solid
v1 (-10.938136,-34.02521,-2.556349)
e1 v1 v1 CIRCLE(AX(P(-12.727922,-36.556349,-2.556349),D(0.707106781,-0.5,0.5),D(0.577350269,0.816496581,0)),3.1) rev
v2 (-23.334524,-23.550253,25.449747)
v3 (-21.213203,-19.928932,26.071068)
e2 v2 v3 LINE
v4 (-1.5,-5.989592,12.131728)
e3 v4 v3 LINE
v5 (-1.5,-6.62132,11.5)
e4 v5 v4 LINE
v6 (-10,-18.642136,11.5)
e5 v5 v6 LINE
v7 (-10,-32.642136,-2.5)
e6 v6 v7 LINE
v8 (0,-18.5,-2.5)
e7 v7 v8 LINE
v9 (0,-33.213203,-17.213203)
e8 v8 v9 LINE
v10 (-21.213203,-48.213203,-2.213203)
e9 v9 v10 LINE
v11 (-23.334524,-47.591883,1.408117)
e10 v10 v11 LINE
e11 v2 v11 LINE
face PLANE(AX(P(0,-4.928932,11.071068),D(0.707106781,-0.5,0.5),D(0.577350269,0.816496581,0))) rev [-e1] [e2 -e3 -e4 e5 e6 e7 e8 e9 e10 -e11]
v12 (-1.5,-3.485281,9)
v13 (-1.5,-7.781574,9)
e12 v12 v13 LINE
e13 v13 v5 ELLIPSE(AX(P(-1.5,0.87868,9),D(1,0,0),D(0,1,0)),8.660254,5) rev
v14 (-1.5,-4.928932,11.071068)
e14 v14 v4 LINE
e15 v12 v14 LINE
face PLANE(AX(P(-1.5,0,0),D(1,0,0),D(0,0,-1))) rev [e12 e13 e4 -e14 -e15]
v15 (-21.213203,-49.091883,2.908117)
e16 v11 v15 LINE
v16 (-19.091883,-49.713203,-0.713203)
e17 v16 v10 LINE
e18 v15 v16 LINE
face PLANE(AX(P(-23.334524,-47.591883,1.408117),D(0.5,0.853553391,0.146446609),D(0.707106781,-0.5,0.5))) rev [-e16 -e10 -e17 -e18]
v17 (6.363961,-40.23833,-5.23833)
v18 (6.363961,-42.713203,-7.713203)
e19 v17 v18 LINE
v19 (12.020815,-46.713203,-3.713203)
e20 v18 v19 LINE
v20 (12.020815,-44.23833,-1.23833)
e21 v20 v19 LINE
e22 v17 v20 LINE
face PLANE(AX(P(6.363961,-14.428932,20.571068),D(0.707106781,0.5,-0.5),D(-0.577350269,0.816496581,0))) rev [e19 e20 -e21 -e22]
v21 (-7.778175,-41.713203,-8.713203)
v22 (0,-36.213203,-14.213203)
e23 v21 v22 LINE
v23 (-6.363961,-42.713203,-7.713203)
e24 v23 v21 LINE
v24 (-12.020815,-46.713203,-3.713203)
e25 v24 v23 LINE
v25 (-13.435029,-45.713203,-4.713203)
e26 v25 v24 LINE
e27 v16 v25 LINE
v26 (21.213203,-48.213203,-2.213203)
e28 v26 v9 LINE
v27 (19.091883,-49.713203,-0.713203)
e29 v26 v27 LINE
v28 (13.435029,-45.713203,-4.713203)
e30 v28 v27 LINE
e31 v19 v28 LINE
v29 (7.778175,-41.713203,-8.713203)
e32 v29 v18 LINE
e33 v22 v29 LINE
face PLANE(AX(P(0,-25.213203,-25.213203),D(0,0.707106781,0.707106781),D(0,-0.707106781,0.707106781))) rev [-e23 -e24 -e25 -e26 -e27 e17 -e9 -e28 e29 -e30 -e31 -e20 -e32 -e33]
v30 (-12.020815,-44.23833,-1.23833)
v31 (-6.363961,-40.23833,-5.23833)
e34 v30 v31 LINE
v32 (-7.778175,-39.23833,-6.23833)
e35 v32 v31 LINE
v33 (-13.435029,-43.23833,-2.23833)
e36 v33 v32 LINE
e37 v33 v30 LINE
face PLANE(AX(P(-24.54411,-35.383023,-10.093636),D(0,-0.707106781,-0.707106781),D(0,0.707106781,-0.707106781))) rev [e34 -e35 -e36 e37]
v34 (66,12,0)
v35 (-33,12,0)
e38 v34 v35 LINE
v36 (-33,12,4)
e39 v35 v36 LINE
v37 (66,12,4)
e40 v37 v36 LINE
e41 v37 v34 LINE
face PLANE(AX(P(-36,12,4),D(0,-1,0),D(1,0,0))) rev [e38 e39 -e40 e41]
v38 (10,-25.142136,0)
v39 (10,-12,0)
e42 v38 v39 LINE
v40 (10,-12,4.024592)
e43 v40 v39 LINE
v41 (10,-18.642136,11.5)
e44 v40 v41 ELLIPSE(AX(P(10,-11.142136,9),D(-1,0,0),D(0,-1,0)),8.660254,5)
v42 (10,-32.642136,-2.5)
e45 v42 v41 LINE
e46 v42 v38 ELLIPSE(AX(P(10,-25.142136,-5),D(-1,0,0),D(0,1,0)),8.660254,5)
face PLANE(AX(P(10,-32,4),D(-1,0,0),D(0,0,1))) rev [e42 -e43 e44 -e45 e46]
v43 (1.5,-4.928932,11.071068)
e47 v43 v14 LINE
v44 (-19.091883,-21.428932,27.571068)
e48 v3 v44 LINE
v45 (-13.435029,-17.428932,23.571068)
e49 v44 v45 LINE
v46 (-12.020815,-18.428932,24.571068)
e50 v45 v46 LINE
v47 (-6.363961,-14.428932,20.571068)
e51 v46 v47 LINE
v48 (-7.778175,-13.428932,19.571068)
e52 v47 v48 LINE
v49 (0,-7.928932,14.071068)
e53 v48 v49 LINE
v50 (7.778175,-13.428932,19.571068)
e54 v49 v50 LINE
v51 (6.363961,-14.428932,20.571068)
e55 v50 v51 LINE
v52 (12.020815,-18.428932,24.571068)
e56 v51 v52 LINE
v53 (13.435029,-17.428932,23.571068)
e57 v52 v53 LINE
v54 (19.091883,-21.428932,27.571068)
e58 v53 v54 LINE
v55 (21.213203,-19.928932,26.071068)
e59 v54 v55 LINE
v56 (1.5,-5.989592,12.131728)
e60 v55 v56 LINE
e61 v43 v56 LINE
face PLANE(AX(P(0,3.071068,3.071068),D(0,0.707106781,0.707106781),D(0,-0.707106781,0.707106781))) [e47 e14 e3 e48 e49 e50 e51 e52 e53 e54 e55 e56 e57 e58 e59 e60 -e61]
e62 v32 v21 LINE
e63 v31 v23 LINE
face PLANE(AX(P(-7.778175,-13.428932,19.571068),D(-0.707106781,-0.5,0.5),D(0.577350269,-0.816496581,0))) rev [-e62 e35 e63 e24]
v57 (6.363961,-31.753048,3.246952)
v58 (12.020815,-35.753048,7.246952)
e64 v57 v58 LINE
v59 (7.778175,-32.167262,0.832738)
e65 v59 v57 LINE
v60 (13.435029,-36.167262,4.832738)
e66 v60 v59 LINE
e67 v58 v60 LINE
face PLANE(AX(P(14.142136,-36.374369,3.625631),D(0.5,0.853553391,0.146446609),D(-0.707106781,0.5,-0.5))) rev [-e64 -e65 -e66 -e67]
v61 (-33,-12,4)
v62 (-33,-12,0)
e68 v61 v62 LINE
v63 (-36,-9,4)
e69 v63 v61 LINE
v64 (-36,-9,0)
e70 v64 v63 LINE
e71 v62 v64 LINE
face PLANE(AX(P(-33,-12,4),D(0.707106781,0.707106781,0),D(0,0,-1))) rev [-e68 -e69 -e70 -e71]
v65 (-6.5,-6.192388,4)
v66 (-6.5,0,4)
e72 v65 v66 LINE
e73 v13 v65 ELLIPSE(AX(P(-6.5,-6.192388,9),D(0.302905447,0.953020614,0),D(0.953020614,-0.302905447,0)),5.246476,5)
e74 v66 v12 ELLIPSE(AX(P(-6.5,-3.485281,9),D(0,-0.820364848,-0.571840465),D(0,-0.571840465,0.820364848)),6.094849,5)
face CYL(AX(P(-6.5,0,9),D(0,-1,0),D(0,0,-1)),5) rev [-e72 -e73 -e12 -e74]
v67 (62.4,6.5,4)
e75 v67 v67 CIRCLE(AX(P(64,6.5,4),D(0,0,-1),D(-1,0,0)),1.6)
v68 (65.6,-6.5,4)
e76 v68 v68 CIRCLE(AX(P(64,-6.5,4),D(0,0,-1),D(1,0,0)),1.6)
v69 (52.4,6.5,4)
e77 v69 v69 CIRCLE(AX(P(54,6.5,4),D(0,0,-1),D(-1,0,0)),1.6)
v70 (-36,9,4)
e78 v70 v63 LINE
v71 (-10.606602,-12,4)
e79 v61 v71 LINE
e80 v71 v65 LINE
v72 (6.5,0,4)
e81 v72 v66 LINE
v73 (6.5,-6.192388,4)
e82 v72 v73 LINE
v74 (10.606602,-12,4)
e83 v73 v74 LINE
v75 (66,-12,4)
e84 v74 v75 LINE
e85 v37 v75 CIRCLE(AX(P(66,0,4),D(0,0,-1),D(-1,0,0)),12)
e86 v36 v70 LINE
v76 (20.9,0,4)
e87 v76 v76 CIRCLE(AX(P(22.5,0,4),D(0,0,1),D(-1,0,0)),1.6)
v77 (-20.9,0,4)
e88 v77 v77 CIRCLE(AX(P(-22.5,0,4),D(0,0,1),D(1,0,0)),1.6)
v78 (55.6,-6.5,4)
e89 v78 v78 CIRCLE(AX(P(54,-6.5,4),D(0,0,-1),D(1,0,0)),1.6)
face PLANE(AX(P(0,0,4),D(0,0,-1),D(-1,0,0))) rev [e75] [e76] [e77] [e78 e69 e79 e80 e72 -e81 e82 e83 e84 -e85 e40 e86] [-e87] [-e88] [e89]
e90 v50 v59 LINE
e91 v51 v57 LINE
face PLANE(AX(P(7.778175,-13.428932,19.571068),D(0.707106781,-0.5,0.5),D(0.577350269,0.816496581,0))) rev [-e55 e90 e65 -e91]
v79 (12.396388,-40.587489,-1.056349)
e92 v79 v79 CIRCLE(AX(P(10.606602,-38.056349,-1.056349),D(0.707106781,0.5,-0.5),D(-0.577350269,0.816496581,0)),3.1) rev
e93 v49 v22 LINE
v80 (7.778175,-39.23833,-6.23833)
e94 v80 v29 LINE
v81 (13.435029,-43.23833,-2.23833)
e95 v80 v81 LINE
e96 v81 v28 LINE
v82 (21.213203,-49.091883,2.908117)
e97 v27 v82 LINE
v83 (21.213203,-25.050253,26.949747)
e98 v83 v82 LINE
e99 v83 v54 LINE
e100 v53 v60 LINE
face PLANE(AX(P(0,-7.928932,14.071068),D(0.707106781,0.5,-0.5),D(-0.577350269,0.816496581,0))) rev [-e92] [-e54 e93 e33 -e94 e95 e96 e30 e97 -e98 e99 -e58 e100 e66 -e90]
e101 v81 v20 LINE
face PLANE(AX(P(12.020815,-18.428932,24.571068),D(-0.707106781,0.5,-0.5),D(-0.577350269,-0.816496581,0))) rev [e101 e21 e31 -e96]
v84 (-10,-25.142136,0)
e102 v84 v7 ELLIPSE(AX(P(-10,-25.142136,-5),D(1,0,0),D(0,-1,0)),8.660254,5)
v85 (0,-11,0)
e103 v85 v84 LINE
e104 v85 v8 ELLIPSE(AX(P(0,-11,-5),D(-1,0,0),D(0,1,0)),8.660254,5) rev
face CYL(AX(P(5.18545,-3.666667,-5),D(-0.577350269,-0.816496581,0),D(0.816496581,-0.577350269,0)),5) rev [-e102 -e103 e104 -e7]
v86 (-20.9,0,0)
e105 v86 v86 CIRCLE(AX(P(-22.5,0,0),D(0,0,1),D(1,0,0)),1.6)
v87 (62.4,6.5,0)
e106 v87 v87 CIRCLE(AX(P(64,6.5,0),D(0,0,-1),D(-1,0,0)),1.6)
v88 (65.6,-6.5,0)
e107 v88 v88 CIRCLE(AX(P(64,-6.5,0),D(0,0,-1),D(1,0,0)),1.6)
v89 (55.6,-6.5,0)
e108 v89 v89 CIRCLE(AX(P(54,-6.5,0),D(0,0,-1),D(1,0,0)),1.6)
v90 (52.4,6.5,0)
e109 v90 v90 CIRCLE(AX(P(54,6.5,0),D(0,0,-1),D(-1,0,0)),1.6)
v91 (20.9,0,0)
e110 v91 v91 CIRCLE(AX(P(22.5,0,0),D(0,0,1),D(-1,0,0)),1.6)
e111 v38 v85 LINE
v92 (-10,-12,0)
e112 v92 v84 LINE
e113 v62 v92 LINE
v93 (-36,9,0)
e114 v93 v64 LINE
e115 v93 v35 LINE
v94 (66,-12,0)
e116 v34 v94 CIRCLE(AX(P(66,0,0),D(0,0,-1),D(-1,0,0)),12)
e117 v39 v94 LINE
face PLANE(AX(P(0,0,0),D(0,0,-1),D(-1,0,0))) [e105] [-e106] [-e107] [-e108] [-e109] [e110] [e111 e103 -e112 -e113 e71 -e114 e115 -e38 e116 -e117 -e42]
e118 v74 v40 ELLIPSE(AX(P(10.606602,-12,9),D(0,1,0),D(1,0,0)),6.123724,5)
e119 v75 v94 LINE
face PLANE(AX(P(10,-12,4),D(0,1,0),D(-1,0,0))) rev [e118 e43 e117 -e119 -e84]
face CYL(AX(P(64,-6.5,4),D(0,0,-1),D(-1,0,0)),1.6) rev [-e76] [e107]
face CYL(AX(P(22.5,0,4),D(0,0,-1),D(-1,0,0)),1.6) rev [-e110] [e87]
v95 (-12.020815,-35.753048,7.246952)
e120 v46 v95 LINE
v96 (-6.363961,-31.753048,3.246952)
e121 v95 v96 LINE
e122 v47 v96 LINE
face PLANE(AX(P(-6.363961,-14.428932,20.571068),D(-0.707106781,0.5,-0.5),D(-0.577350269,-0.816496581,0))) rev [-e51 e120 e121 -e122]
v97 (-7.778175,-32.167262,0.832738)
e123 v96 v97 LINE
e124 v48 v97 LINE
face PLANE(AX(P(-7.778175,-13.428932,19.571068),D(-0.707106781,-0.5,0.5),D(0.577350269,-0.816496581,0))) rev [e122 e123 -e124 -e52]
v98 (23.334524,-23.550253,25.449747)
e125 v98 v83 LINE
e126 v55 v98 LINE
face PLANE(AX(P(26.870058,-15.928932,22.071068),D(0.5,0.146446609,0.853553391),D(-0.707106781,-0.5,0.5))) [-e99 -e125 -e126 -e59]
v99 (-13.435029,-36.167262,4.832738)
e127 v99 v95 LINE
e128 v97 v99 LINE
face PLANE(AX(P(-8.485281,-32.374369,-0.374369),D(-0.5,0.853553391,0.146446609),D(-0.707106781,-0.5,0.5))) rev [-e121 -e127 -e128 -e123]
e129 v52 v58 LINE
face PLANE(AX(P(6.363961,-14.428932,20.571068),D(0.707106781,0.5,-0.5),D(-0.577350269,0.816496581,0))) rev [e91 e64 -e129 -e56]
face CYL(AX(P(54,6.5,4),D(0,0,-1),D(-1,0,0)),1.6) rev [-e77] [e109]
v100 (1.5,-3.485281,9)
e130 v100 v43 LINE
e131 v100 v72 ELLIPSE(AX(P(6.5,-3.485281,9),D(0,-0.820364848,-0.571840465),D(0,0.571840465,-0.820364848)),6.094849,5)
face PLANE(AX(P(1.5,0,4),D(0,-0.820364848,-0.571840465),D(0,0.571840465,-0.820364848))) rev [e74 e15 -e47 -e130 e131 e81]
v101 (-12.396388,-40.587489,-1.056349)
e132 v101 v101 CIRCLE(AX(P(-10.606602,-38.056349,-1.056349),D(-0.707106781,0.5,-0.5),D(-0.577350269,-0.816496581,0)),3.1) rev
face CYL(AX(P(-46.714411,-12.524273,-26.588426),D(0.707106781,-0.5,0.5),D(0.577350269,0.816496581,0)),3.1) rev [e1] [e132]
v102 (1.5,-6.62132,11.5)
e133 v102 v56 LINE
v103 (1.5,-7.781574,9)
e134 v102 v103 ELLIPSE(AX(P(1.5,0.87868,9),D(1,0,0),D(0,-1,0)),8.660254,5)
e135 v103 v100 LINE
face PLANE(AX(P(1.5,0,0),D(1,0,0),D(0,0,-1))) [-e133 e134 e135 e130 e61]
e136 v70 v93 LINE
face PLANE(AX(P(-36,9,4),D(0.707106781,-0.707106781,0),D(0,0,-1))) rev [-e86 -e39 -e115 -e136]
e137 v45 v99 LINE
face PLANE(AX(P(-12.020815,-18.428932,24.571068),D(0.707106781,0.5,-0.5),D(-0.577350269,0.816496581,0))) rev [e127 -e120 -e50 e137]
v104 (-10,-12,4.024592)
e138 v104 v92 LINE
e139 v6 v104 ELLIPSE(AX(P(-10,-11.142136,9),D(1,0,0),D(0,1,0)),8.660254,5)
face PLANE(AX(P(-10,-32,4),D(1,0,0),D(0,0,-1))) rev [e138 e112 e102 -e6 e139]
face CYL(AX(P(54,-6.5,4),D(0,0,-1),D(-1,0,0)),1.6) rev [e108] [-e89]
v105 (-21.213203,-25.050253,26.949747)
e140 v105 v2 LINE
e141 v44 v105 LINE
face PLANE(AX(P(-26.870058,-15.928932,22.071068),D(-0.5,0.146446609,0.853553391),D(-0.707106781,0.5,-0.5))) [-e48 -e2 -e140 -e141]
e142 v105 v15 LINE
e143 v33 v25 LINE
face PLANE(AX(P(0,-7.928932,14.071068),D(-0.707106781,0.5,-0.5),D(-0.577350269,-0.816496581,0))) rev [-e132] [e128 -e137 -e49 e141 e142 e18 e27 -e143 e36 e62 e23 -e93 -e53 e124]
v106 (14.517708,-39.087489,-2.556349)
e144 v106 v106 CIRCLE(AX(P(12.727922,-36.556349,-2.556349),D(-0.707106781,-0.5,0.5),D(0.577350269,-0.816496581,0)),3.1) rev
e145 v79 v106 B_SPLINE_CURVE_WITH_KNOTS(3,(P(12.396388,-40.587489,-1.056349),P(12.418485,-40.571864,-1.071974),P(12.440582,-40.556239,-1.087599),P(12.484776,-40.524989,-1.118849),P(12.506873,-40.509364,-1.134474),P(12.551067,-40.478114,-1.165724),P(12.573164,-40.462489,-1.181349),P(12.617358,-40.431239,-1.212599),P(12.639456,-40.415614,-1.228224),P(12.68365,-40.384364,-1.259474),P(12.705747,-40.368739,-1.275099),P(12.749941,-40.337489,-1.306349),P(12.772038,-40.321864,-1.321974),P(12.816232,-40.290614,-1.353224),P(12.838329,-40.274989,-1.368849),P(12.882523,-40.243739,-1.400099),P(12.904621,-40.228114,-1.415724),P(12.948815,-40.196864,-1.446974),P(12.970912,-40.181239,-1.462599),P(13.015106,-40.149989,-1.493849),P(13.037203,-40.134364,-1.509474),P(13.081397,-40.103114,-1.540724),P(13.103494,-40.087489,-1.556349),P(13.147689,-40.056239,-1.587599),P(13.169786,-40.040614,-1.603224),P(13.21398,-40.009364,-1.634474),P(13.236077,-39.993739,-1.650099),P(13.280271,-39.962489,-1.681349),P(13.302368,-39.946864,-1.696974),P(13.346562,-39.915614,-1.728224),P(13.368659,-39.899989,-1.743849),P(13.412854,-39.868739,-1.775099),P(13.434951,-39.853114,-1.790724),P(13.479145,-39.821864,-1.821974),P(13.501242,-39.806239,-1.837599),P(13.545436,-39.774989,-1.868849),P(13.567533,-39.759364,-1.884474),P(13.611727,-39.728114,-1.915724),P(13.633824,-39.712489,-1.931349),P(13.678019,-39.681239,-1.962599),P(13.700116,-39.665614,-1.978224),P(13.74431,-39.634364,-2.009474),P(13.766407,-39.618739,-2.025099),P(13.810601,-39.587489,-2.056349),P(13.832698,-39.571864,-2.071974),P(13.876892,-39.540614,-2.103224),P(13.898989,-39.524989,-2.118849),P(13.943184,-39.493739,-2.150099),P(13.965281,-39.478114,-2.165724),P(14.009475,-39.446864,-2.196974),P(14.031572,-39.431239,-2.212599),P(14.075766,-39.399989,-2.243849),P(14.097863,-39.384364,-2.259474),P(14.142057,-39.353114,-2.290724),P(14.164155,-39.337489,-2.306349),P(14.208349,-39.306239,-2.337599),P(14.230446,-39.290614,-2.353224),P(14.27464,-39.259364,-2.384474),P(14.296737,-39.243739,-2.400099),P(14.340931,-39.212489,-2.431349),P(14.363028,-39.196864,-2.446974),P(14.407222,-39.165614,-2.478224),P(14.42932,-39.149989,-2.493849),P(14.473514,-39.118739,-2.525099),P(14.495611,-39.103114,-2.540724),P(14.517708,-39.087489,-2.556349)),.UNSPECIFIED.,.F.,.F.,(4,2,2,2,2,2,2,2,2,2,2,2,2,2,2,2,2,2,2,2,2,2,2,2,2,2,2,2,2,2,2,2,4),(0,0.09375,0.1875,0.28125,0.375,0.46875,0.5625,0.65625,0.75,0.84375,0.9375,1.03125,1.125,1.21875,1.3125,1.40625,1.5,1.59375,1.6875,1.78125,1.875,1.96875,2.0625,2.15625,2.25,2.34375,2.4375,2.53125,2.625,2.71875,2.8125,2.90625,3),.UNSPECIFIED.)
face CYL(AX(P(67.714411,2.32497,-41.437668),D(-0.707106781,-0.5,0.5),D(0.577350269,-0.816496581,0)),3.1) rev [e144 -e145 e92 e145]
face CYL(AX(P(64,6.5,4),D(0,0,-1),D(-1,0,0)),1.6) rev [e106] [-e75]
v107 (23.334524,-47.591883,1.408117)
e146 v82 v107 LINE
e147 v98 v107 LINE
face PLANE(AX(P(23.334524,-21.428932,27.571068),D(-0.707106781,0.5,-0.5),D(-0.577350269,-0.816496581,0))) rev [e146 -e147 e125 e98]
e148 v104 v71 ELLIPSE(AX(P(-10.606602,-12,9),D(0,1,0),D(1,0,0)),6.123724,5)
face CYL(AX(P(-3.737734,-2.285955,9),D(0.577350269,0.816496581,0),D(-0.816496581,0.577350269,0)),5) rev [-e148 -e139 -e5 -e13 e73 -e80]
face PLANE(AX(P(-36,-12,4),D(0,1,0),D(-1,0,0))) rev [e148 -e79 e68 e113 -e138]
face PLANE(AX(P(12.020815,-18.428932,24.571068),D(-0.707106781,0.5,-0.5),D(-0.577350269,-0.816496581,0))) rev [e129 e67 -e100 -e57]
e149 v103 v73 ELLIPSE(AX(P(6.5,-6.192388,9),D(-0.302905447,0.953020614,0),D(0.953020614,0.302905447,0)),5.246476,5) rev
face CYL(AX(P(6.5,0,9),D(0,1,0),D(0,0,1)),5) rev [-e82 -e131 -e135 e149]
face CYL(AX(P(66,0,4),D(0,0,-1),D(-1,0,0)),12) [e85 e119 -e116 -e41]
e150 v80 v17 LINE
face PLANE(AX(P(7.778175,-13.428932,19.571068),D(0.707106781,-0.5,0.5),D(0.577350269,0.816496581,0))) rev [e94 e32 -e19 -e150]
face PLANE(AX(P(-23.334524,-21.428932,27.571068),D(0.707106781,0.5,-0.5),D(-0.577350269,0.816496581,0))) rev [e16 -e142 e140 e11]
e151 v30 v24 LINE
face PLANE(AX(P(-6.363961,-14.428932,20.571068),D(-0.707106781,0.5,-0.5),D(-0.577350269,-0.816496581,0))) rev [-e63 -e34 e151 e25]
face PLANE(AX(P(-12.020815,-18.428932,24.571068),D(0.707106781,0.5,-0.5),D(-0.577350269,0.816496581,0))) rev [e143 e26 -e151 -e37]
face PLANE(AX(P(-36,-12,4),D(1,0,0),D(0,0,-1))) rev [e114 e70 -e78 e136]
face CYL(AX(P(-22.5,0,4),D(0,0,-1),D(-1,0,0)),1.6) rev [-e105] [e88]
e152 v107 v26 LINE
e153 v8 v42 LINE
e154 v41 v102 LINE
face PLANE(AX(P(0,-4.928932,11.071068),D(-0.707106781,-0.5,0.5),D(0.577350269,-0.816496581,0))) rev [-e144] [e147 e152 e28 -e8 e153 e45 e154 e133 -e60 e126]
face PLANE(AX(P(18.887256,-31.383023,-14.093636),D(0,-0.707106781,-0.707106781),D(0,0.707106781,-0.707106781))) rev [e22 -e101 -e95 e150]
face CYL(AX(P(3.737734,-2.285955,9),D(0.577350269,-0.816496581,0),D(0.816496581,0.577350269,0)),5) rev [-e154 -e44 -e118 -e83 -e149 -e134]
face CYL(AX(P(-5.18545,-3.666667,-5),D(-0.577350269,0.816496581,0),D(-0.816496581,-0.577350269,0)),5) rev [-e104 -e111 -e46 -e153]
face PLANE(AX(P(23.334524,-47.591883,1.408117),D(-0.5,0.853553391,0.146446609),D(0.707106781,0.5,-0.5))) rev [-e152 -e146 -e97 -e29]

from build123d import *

# Parameters (mm, degrees)
CROQUIS1_R                   = 1.6
SALIENTE_EXTRUIR1_DEPTH      = 4
CROQUIS3_R                   = 1.6
SALIENTE_EXTRUIR3_DEPTH      = 4
SALIENTE_EXTRUIR4_DEPTH      = 10
SALIENTE_EXTRUIR4_DEPTH_BACK = 30
CORTAR_EXTRUIR8_REACH        = 102.817
CROQUIS13_R                  = 3.1
CORTAR_EXTRUIR9_DEPTH        = 2
CORTAR_EXTRUIR10_REACH       = 92.973
CROQUIS15_R                  = 3.1
CORTAR_EXTRUIR11_DEPTH       = 2
CORTAR_EXTRUIR12_DEPTH       = 99.523002923
SALIENTE_EXTRUIR5_DEPTH      = 1.5
REDONDEO1_R                  = 5
CHAFL_N1_SIZE                = 3
REDONDEO2_R                  = 5


with BuildPart() as part:
    # Croquis1 → Saliente-Extruir1 (new body)
    with BuildSketch(Plane.XY):
        Polygon((10, -12), (36, -12), (36, 12), (-36, 12), (-36, -12), (-10, -12), (-10, -32), (10, -32), align=None)
        with Locations((-22.5, 0)):
            Circle(CROQUIS1_R, mode=Mode.SUBTRACT)
        with Locations(Location((22.5, 0, 0), (0, 0, 180))):
            Circle(CROQUIS1_R, mode=Mode.SUBTRACT)
    extrude(amount=SALIENTE_EXTRUIR1_DEPTH)

    # Croquis3 → Saliente-Extruir3 (add)
    with BuildSketch(Plane(origin=(0, 0, 0), x_dir=(-1, 0, 0), z_dir=(0, 0, -1))):
        with BuildLine():
            Line((-66, 12), (-36, 12))
            Line((-36, 12), (-36, -12))
            Line((-36, -12), (-66, -12))
            ThreePointArc((-66, -12), (-78, 0), (-66, 12))
        make_face()
        with Locations((-54, 6.5)):
            Circle(CROQUIS3_R, mode=Mode.SUBTRACT)
        with Locations((-64, 6.5)):
            Circle(CROQUIS3_R, mode=Mode.SUBTRACT)
        with Locations(Location((-54, -6.5, 0), (0, 0, 180))):
            Circle(CROQUIS3_R, mode=Mode.SUBTRACT)
        with Locations(Location((-64, -6.5, 0), (0, 0, 180))):
            Circle(CROQUIS3_R, mode=Mode.SUBTRACT)
    extrude(amount=-SALIENTE_EXTRUIR3_DEPTH)

    # Croquis5 → Saliente-Extruir4 (add, two sides: drawn at the far end of the back side and taken through both)
    with BuildSketch(Plane(origin=(0, -4.201010127, -3.798989873), x_dir=(1, 0, 0), z_dir=(0, 0.7071067811865438, 0.7071067811865512)).offset(-SALIENTE_EXTRUIR4_DEPTH_BACK)):
        Polygon((-13.435028843, -28.707106781), (-21.213203436, -36.485281374), (-23.334523779, -34.363961031), (0, -11.029437252), (23.334523779, -34.363961031), (21.213203436, -36.485281374), (13.435028843, -28.707106781), (12.02081528, -30.121320344), (6.363961031, -24.464466094), (7.778174593, -23.050252532), (0, -15.272077939), (-7.778174593, -23.050252532), (-6.363961031, -24.464466094), (-12.02081528, -30.121320344), align=None)
    extrude(amount=SALIENTE_EXTRUIR4_DEPTH + SALIENTE_EXTRUIR4_DEPTH_BACK)

    # Croquis13 → Cortar-Extruir8 (cut, up to next)
    with BuildSketch(Plane(origin=(-9.192388155, -6.5, 6.5), x_dir=(0.40824829046385985, 0.2886751345948103, 0.866025403784441), z_dir=(-0.7071067811865496, -0.5000000000000013, 0.4999999999999959)), mode=Mode.PRIVATE) as cortar_extruir8_sk1:
        with Locations(Location((-7.570619935, -37.19660335, 0), (0, 0, 270))):
            Circle(CROQUIS13_R)
    cortar_extruir8_tool1 = extrude(cortar_extruir8_sk1.sketch, amount=-CORTAR_EXTRUIR8_REACH, mode=Mode.PRIVATE) & part.part
    add(cortar_extruir8_tool1.solids().sort_by_distance((9.192388, -39.056349, -0.056349))[0], mode=Mode.SUBTRACT)

    # Croquis14 → Cortar-Extruir9 (cut)
    with BuildSketch(Plane(origin=(-9.192388155, -6.5, 6.5), x_dir=(0.40824829046385985, 0.2886751345948103, 0.866025403784441), z_dir=(-0.7071067811865496, -0.5000000000000013, 0.4999999999999959))):
        Polygon((-13.554255626, -36.528693238), (-8.935453472, -43.060665885), (-1.586984244, -37.864513462), (-6.205786398, -31.332540815), align=None)
    extrude(amount=-CORTAR_EXTRUIR9_DEPTH, mode=Mode.SUBTRACT)

    # Croquis15 → Cortar-Extruir10 (cut, up to next)
    with BuildSketch(Plane(origin=(6.12825877, -4.333333333, 13), x_dir=(0.6666666666666553, 0.23570226039552375, -0.7071067811865557), z_dir=(0.7071067811865587, -0.49999999999999484, 0.4999999999999895)), mode=Mode.PRIVATE) as cortar_extruir10_sk1:
        with Locations(Location((-9.165824894, -39.075132248, 0), (0, 0, 54.735610317))):
            Circle(CROQUIS15_R)
    cortar_extruir10_tool1 = extrude(cortar_extruir10_sk1.sketch, amount=-CORTAR_EXTRUIR10_REACH, mode=Mode.PRIVATE) & part.part
    add(cortar_extruir10_tool1.solids().sort_by_distance((-9.192388, -39.056349, -0.056349))[0], mode=Mode.SUBTRACT)

    # Croquis17 → Cortar-Extruir11 (cut)
    with BuildSketch(Plane(origin=(6.12825877, -4.333333333, 13), x_dir=(0.6666666666666595, 0.2357022603955385, -0.7071067811865467), z_dir=(0.7071067811865586, -0.4999999999999948, 0.49999999999998956))):
        Polygon((-11.437061061, -44.651106269), (-3.894588728, -41.984439602), (-6.894588728, -33.499158228), (-14.437061061, -36.165824894), align=None)
    extrude(amount=-CORTAR_EXTRUIR11_DEPTH, mode=Mode.SUBTRACT)

    # Croquis18 → Cortar-Extruir12 (cut, through all)
    with BuildSketch(Plane(origin=(0, 3.071067812, 3.071067812), x_dir=(1, 0, 0), z_dir=(0, 0.7071067811865438, 0.7071067811865513))):
        Polygon((-7.071067812, -25.455844123), (-6.363961031, -24.748737342), (-7.778174593, -23.334523779), (0, -15.556349186), (7.778174593, -23.334523779), (6.363961031, -24.748737342), (7.071067812, -25.455844123), align=None)
    extrude(amount=-CORTAR_EXTRUIR12_DEPTH, mode=Mode.SUBTRACT)

    # Croquis19 → Saliente-Extruir5 (add, symmetric)
    with BuildSketch(Plane(origin=(0, 0, 0), x_dir=(0, 0, -1), z_dir=(1, 0, 0))):
        Polygon((-11.071067812, -4.928932188), (-12.636805519, -6.494669895), (-4, -15.642184556), (-4, 0), align=None)
    extrude(amount=SALIENTE_EXTRUIR5_DEPTH, both=True)

    # Redondeo1
    # the kernel refuses this fillet: 5 mm, written as the material it adds along each edge
    with BuildSketch(Plane(origin=(1.5, -26.621320344, 4), x_dir=(0, 0, 1), z_dir=(0, 1, 0))) as redondeo1_piece_1_section:
        with BuildLine():
            CenterArc((REDONDEO1_R, REDONDEO1_R), REDONDEO1_R, 180, 90)
            Line((0, REDONDEO1_R), (0, 0))
            Line((0, 0), (REDONDEO1_R, 0))
        make_face()
    redondeo1_piece_1 = extrude(amount=39.121320344, mode=Mode.PRIVATE)
    redondeo1_piece_1 = split(redondeo1_piece_1, bisect_by=Plane(origin=(2.770443411, -3.003654562, 8.309056055), z_dir=(0, -0.8203648475065346, -0.5718404646189182)), keep=Keep.TOP, mode=Mode.PRIVATE)
    redondeo1_piece_1 = split(redondeo1_piece_1, bisect_by=Plane(origin=(0.243258748, -9.601208631, 6.742811189), z_dir=(0.7071067811865499, 0.5000000000000011, -0.4999999999999958)), keep=Keep.TOP, mode=Mode.PRIVATE)
    add(redondeo1_piece_1)
    with BuildSketch(Plane(origin=(22.5, -43.819805153, 4), x_dir=(0.40824829046386, 0.28867513459481037, 0.8660254037844409), z_dir=(-0.5773502691896252, 0.8164965809277265, 0))) as redondeo1_piece_2_section:
        with BuildLine():
            CenterArc((REDONDEO1_R * 1.73205080757, REDONDEO1_R), REDONDEO1_R, 150, 120)
            Line((REDONDEO1_R * 0.866025403784, REDONDEO1_R * 1.5), (0, 0))
            Line((0, 0), (REDONDEO1_R * 1.73205080757, 0))
        make_face()
    redondeo1_piece_2 = extrude(amount=58.023702054, mode=Mode.PRIVATE)
    redondeo1_piece_2 = split(redondeo1_piece_2, bisect_by=Plane(origin=(10.121286225, -12, 4.004914318), z_dir=(0, 1, 0)), keep=Keep.TOP, mode=Mode.PRIVATE)
    redondeo1_piece_2 = split(redondeo1_piece_2, bisect_by=Plane(origin=(1.5, -11.828475377, 4.004914318), z_dir=(1, 0, 0)), keep=Keep.TOP, mode=Mode.PRIVATE)
    redondeo1_piece_2 = split(redondeo1_piece_2, bisect_by=Plane(origin=(10.121286225, -3.870234786, 9.552255859), z_dir=(0, -0.8203648475065346, -0.5718404646189182)), keep=Keep.TOP, mode=Mode.PRIVATE)
    add(redondeo1_piece_2)
    with BuildSketch(Plane(origin=(22.5, -43.819805153, 4), x_dir=(0.40824829046386, 0.28867513459481037, 0.8660254037844409), z_dir=(-0.5773502691896252, 0.8164965809277265, 0))) as redondeo1_piece_3_section:
        with BuildLine():
            CenterArc((REDONDEO1_R * 1.73205080757, REDONDEO1_R), REDONDEO1_R, 150, 120)
            Line((REDONDEO1_R * 0.866025403784, REDONDEO1_R * 1.5), (0, 0))
            Line((0, 0), (REDONDEO1_R * 1.73205080757, 0))
        make_face()
    redondeo1_piece_3 = extrude(amount=58.023702054, mode=Mode.PRIVATE)
    redondeo1_piece_3 = split(redondeo1_piece_3, bisect_by=Plane(origin=(1.5, -16.67856606, 5.887042233), z_dir=(1, 0, 0)), keep=Keep.TOP, mode=Mode.PRIVATE)
    redondeo1_piece_3 = split(redondeo1_piece_3, bisect_by=Plane(origin=(6.744949826, -6.339161533, 13.094189037), z_dir=(0, -0.8203648475065346, -0.5718404646189182)), keep=Keep.TOP, mode=Mode.PRIVATE)
    redondeo1_piece_3 = split(redondeo1_piece_3, bisect_by=Plane(origin=(10, -16.67856606, 5.887042233), z_dir=(-1, 0, 0)), keep=Keep.TOP, mode=Mode.PRIVATE)
    add(redondeo1_piece_3)
    with BuildSketch(Plane(origin=(11, 3.556349186, 4), x_dir=(-0.40824829046385974, 0.2886751345948099, 0.8660254037844413), z_dir=(-0.577350269189625, -0.8164965809277267, 0))) as redondeo1_piece_4_section:
        with BuildLine():
            CenterArc((REDONDEO1_R * 1.73205080757, REDONDEO1_R), REDONDEO1_R, 150, 120)
            Line((REDONDEO1_R * 0.866025403784, REDONDEO1_R * 1.5), (0, 0))
            Line((0, 0), (REDONDEO1_R * 1.73205080757, 0))
        make_face()
    redondeo1_piece_4 = extrude(amount=58.023702054, mode=Mode.PRIVATE)
    redondeo1_piece_4 = split(redondeo1_piece_4, bisect_by=Plane(origin=(-10, -9.487690483, 5.71835717), z_dir=(1, 0, 0)), keep=Keep.TOP, mode=Mode.PRIVATE)
    redondeo1_piece_4 = split(redondeo1_piece_4, bisect_by=Plane(origin=(-3.276486879, -3.908601143, 9.607296403), z_dir=(0, -0.8203648475065346, -0.5718404646189182)), keep=Keep.TOP, mode=Mode.PRIVATE)
    redondeo1_piece_4 = split(redondeo1_piece_4, bisect_by=Plane(origin=(-1.5, -9.487690483, 5.71835717), z_dir=(-1, 0, 0)), keep=Keep.TOP, mode=Mode.PRIVATE)
    add(redondeo1_piece_4)
    with BuildSketch(Plane(origin=(11, 3.556349186, 4), x_dir=(-0.40824829046385974, 0.2886751345948099, 0.8660254037844413), z_dir=(-0.577350269189625, -0.8164965809277267, 0))) as redondeo1_piece_5_section:
        with BuildLine():
            CenterArc((REDONDEO1_R * 1.73205080757, REDONDEO1_R), REDONDEO1_R, 150, 120)
            Line((REDONDEO1_R * 0.866025403784, REDONDEO1_R * 1.5), (0, 0))
            Line((0, 0), (REDONDEO1_R * 1.73205080757, 0))
        make_face()
    redondeo1_piece_5 = extrude(amount=58.023702054, mode=Mode.PRIVATE)
    redondeo1_piece_5 = split(redondeo1_piece_5, bisect_by=Plane(origin=(-10.121286225, -12, 4.004914318), z_dir=(0, 1, 0)), keep=Keep.TOP, mode=Mode.PRIVATE)
    redondeo1_piece_5 = split(redondeo1_piece_5, bisect_by=Plane(origin=(-10.121286225, -3.870234786, 9.552255859), z_dir=(0, -0.8203648475065346, -0.5718404646189182)), keep=Keep.TOP, mode=Mode.PRIVATE)
    redondeo1_piece_5 = split(redondeo1_piece_5, bisect_by=Plane(origin=(-1.5, -11.828475377, 4.004914318), z_dir=(-1, 0, 0)), keep=Keep.TOP, mode=Mode.PRIVATE)
    add(redondeo1_piece_5)
    with BuildSketch(Plane(origin=(-1.5, -26.621320344, 4), x_dir=(0, 0, 1), z_dir=(0, 1, 0))) as redondeo1_piece_6_section:
        with BuildLine():
            CenterArc((REDONDEO1_R, -REDONDEO1_R), REDONDEO1_R, 90, 90)
            Line((0, -REDONDEO1_R), (0, 0))
            Line((0, 0), (REDONDEO1_R, 0))
        make_face()
    redondeo1_piece_6 = extrude(amount=39.121320344, mode=Mode.PRIVATE)
    redondeo1_piece_6 = split(redondeo1_piece_6, bisect_by=Plane(origin=(1.878061596, -11.101208631, 8.242811189), z_dir=(-0.7071067811865511, 0.5000000000000001, -0.4999999999999948)), keep=Keep.TOP, mode=Mode.PRIVATE)
    redondeo1_piece_6 = split(redondeo1_piece_6, bisect_by=Plane(origin=(-2.770443411, -3.003654562, 8.309056055), z_dir=(0, -0.8203648475065346, -0.5718404646189182)), keep=Keep.TOP, mode=Mode.PRIVATE)
    add(redondeo1_piece_6)

    # Chaflán1
    # the kernel refuses this chamfer: 3 mm, written as the material it takes off along each edge
    with BuildSketch(Plane(origin=(0.908597591, -30.016844189, -2.731893153), x_dir=(-0.01944252080601415, 0.6930914977653764, 0.7205873743759705), z_dir=(0.7071067811865457, -0.5000000000000041, 0.49999999999999856))) as chafl_n1_piece_1_section:
        Polygon((CHAFL_N1_SIZE * 0.999621916911, -CHAFL_N1_SIZE * 0.0274958766106), (-CHAFL_N1_SIZE * 0.0274958766106, -CHAFL_N1_SIZE * 0.999621916911), (0, 0), align=None)
    chafl_n1_piece_1 = extrude(amount=23.430097928, mode=Mode.PRIVATE)
    chafl_n1_piece_1 = split(chafl_n1_piece_1, bisect_by=Plane(origin=(10.606601718, -34.102143715, 2.897856285), z_dir=(-0.7071067811865376, -0.5000000000000097, 0.5000000000000046)), keep=Keep.TOP, mode=Mode.PRIVATE)
    add(chafl_n1_piece_1, mode=Mode.SUBTRACT)
    with BuildSketch(Plane(origin=(-36, -12, -7.715048964), x_dir=(0.9996219169112968, -0.02749587661058619, 0), z_dir=(0, 0, 1)), Plane(origin=(-36, 12, -7.715048964), x_dir=(-0.02749587661058678, -0.9996219169112968, 0), z_dir=(0, 0, 1))) as chafl_n1_piece_2:
        Polygon((CHAFL_N1_SIZE * 0.999621916911, CHAFL_N1_SIZE * 0.0274958766106), (-CHAFL_N1_SIZE * 0.0274958766106, CHAFL_N1_SIZE * 0.999621916911), (0, 0), align=None)
    extrude(amount=19.430097928, mode=Mode.SUBTRACT)
    with BuildSketch(Plane(origin=(-17.47617872, -41.731893153, 8.983155811), x_dir=(-0.7068394360706848, 0.48036843764962867, -0.5192534792616522), z_dir=(0.7071067811865362, 0.5000000000000103, -0.5000000000000059))) as chafl_n1_piece_3_section:
        Polygon((CHAFL_N1_SIZE * 0.999621916911, CHAFL_N1_SIZE * 0.0274958766106), (-CHAFL_N1_SIZE * 0.0274958766106, CHAFL_N1_SIZE * 0.999621916911), (0, 0), align=None)
    chafl_n1_piece_3 = extrude(amount=23.430097928, mode=Mode.PRIVATE)
    chafl_n1_piece_3 = split(chafl_n1_piece_3, bisect_by=Plane(origin=(-10.606601718, -34.102143715, 2.897856285), z_dir=(0.7071067811865511, -0.5000000000000001, 0.4999999999999948)), keep=Keep.TOP, mode=Mode.PRIVATE)
    add(chafl_n1_piece_3, mode=Mode.SUBTRACT)
    with BuildSketch(Plane(origin=(-15.757839996, -55.070727918, 4.644321046), x_dir=(-0.01944252080601493, 0.693091497765376, 0.7205873743759708), z_dir=(-0.7071067811865476, 0.5000000000000027, -0.4999999999999974))) as chafl_n1_piece_4:
        Polygon((CHAFL_N1_SIZE * 0.999621916911, CHAFL_N1_SIZE * 0.0274958766106), (-CHAFL_N1_SIZE * 0.0274958766106, CHAFL_N1_SIZE * 0.999621916911), (0, 0), align=None)
    extrude(amount=18.430097928, mode=Mode.SUBTRACT)
    with BuildSketch(Plane(origin=(28.789887219, -45.855678954, -4.570727918), x_dir=(-0.7068394360706699, 0.48036843764963866, -0.5192534792616634), z_dir=(-0.7071067811865511, -0.5000000000000001, 0.4999999999999949)), Plane(origin=(-15.757839996, -26.78645667, 32.928592294), x_dir=(-0.019442520806013802, -0.7205873743759628, -0.6930914977653844), z_dir=(-0.7071067811865476, 0.5000000000000027, -0.4999999999999974)), Plane(origin=(28.789887219, -17.571407706, 23.71354333), x_dir=(0.019442520806014007, -0.7205873743759631, -0.693091497765384), z_dir=(-0.7071067811865511, -0.5000000000000001, 0.4999999999999949))) as chafl_n1_piece_5:
        Polygon((CHAFL_N1_SIZE * 0.999621916911, -CHAFL_N1_SIZE * 0.0274958766106), (-CHAFL_N1_SIZE * 0.0274958766106, -CHAFL_N1_SIZE * 0.999621916911), (0, 0), align=None)
    extrude(amount=18.430097928, mode=Mode.SUBTRACT)

    # Redondeo2
    redondeo2_edges = [part.edges().sort_by_distance(p)[0] for p in [
        (-5, -23.071067812, 0),
        (5, -23.071067812, 0),
    ]]
    fillet(redondeo2_edges, radius=REDONDEO2_R)


solid = part.part
